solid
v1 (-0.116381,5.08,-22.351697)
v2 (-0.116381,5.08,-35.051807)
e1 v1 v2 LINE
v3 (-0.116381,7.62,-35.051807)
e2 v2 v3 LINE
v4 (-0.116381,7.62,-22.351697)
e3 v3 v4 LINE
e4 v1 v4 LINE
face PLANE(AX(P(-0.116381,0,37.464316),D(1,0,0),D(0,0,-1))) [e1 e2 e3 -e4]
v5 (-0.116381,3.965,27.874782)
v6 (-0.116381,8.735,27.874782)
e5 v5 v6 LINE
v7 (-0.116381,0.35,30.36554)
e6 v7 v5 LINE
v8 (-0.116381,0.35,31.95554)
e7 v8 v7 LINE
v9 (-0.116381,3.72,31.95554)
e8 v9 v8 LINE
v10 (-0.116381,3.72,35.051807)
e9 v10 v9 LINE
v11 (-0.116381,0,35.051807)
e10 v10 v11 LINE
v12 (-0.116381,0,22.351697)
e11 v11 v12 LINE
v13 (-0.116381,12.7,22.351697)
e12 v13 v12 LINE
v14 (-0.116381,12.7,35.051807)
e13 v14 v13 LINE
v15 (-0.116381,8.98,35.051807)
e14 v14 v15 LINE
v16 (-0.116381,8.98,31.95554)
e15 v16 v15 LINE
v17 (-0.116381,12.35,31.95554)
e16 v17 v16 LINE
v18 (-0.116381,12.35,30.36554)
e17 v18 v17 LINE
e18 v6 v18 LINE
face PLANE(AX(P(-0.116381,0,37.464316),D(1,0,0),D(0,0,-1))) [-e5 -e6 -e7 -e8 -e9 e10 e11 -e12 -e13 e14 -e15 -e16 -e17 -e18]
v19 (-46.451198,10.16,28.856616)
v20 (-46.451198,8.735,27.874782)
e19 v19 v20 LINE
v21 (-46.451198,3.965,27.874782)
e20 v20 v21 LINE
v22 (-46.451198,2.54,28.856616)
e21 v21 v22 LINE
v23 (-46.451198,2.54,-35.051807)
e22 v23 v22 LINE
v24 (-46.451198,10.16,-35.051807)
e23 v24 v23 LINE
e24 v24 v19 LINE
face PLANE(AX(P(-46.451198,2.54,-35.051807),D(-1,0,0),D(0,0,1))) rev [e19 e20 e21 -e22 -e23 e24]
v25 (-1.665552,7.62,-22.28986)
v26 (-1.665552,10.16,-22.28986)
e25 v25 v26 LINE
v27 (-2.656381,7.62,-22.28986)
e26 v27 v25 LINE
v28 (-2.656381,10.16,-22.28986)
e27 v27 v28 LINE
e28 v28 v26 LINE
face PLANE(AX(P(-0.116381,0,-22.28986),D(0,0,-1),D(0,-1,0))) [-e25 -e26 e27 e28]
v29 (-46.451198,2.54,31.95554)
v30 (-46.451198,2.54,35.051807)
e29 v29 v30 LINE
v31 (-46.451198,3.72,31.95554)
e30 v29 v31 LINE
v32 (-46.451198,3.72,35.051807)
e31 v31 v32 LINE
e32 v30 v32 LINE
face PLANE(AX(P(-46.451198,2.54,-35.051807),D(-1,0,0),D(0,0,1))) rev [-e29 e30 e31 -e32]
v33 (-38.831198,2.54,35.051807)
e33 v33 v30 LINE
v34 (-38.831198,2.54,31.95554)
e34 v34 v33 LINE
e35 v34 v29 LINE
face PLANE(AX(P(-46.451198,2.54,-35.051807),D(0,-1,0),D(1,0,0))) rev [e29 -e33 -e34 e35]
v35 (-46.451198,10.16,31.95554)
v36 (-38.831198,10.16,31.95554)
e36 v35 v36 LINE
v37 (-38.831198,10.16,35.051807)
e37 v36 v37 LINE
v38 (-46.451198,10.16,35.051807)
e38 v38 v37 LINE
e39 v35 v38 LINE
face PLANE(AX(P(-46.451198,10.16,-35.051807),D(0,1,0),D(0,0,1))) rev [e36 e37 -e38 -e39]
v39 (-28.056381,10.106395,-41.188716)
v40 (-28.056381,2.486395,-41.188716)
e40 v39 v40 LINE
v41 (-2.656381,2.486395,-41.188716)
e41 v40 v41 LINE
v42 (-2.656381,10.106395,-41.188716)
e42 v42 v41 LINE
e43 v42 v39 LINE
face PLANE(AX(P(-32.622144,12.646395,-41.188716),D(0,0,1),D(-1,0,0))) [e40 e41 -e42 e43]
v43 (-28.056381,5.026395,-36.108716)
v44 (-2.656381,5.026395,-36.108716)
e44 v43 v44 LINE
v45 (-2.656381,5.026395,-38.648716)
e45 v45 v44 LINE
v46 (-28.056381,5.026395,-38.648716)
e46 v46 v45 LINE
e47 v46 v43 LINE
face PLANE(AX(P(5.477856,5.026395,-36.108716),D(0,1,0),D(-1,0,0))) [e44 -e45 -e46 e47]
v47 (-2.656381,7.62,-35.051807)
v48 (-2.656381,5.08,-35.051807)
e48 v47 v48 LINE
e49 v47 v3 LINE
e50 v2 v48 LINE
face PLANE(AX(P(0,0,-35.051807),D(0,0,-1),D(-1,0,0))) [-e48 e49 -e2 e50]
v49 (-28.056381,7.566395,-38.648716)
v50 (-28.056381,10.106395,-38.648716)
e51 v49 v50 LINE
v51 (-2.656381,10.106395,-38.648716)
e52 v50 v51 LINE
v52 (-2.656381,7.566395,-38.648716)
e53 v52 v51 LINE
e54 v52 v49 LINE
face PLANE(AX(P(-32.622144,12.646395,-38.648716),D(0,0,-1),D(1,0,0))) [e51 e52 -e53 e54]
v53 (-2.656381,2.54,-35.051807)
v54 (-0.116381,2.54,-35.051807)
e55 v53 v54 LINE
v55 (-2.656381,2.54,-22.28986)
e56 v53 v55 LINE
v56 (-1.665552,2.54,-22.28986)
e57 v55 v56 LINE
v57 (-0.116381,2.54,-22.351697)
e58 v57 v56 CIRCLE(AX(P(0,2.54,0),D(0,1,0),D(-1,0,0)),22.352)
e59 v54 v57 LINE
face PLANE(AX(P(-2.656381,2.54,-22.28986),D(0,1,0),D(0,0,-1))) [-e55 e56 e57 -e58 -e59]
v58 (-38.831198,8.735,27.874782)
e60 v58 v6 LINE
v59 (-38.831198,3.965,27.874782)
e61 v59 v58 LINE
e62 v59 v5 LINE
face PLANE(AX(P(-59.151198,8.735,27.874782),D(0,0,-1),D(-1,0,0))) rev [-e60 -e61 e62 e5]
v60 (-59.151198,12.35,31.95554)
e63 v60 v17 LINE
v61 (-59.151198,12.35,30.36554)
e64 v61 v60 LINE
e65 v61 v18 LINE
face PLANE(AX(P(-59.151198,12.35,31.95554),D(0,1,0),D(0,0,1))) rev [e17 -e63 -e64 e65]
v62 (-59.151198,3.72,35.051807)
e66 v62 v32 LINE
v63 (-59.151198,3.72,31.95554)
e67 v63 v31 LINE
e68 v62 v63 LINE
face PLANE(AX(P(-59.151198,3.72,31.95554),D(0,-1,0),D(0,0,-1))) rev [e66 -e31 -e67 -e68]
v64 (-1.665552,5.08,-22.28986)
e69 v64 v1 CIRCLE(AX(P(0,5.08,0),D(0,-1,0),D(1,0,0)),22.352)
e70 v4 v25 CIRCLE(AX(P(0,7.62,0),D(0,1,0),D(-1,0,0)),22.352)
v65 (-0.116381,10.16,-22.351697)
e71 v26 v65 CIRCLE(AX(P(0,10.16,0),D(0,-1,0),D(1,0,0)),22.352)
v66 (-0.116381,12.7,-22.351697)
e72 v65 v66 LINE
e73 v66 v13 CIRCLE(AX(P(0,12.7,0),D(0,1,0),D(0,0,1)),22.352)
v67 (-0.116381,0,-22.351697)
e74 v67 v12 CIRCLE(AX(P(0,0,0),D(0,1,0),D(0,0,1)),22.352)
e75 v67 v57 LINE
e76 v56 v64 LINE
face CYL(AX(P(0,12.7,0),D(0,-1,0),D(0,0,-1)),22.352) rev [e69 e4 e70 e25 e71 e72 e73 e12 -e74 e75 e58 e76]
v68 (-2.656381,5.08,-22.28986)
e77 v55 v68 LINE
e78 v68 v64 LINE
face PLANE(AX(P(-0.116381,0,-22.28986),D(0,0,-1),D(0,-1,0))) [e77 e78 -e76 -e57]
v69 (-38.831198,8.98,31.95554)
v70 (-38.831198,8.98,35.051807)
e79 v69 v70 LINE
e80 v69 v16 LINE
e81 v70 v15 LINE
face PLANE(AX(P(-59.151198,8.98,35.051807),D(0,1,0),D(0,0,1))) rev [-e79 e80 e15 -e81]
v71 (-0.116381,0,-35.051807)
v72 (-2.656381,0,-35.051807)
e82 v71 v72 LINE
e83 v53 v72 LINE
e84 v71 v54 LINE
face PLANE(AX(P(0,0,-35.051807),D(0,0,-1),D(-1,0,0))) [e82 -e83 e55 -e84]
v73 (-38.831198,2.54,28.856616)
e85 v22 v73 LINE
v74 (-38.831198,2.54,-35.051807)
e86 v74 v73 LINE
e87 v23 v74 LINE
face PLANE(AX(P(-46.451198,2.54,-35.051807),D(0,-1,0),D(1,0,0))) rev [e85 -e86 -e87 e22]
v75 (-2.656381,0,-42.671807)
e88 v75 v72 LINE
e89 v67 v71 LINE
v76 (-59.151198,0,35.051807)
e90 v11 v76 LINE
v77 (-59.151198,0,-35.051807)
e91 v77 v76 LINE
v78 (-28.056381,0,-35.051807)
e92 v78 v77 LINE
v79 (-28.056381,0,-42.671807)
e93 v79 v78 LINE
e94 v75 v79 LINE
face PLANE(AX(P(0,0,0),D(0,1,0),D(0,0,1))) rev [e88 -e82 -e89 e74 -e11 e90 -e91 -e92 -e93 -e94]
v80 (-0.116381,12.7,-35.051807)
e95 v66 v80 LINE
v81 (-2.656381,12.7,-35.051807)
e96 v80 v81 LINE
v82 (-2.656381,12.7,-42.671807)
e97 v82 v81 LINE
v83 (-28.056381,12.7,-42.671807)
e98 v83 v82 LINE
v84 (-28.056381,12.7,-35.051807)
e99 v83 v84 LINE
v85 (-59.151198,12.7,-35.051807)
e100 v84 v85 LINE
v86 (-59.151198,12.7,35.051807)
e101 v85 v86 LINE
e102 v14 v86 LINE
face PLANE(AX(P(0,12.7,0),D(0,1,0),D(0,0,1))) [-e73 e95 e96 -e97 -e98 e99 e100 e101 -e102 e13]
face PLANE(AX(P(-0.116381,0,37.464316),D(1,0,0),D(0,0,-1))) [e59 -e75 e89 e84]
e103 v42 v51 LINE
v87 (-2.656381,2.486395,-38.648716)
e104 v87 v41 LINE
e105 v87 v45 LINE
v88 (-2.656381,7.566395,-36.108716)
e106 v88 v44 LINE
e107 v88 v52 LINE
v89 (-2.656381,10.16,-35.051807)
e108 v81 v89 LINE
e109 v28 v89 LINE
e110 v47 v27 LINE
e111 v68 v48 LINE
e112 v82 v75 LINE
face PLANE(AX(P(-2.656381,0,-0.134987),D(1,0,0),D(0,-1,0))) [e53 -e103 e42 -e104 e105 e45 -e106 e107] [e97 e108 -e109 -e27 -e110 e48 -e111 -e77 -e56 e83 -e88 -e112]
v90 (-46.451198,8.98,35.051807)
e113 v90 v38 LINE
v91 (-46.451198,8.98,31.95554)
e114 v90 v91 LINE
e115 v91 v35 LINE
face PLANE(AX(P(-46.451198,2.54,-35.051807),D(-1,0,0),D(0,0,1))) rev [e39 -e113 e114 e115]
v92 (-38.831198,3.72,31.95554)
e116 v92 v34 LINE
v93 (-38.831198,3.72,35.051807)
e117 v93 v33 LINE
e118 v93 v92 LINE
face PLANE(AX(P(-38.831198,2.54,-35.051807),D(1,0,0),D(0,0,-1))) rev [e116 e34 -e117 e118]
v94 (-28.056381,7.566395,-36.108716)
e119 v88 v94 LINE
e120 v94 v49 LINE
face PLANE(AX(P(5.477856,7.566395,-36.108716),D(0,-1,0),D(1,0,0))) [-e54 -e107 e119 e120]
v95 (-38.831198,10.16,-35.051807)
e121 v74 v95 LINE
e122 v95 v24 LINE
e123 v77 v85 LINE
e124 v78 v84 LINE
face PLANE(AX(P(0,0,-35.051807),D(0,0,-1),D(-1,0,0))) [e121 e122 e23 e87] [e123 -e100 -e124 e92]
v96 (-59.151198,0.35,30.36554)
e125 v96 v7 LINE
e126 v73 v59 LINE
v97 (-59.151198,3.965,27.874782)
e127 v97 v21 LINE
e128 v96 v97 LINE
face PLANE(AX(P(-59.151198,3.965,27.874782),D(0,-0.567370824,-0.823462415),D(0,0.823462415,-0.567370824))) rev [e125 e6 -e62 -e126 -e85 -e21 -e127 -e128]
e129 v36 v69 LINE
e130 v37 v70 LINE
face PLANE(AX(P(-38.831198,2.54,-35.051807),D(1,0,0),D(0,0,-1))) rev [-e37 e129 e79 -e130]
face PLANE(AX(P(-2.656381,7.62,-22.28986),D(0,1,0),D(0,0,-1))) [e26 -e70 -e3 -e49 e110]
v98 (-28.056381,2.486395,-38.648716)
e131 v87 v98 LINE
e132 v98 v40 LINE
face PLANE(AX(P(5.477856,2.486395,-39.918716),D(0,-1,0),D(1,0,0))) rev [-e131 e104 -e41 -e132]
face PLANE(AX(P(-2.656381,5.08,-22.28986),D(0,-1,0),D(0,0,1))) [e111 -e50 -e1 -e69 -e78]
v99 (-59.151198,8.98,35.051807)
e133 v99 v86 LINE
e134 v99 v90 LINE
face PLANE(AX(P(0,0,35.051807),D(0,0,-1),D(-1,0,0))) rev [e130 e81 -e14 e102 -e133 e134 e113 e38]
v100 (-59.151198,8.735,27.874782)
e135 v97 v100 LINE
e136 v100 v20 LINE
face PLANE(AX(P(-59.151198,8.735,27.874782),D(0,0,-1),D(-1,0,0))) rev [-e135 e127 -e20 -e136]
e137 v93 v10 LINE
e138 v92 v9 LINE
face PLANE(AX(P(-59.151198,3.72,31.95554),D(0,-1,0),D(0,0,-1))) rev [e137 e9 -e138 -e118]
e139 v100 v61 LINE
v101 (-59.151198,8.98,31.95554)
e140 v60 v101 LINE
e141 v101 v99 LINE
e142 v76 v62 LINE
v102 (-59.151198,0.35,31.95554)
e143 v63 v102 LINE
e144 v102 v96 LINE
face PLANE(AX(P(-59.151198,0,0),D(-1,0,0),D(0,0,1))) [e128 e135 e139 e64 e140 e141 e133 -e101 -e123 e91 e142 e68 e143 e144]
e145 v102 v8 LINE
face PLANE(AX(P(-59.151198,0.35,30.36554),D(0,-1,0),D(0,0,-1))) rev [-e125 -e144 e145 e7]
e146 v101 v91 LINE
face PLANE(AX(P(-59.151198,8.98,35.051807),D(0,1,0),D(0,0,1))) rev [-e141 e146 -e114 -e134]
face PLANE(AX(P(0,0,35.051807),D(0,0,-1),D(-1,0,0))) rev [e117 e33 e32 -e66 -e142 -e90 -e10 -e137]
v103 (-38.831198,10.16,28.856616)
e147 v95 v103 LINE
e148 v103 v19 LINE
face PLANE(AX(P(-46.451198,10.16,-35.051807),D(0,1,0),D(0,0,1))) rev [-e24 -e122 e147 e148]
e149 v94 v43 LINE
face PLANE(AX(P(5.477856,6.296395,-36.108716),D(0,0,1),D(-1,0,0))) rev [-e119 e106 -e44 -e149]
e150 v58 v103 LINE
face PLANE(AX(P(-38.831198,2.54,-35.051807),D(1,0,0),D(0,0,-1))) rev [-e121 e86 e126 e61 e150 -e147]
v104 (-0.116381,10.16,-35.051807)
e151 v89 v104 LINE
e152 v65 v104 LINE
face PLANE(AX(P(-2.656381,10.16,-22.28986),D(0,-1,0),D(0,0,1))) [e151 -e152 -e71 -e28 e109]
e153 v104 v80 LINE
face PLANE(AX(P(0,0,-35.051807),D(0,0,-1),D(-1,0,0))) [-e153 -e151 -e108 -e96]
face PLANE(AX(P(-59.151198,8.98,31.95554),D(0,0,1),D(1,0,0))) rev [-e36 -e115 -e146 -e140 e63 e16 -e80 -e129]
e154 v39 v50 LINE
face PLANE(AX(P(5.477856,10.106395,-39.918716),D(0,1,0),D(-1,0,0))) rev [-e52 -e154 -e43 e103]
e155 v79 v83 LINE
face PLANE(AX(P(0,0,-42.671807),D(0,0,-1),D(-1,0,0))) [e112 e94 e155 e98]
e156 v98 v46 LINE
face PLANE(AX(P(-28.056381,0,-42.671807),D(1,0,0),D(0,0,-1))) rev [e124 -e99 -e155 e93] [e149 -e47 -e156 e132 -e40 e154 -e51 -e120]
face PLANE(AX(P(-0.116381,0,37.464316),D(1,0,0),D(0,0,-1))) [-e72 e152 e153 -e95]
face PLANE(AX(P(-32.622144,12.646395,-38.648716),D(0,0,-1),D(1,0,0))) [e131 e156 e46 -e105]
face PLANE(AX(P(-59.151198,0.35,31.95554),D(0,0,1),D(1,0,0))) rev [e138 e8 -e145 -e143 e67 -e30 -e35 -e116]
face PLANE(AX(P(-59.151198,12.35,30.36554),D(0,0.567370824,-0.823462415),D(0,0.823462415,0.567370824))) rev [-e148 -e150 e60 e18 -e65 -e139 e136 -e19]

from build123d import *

# Parameters (mm, degrees)
SKETCH1_R               = 35.052
SKETCH1_R_2             = 22.352
BOSS_EXTRUDE2_DEPTH     = 12.7
CUT_EXTRUDE4_DEPTH      = 52.172017822
CUT_EXTRUDE4_DEPTH_BACK = 52.172017822
SKETCH4_W               = 50.006101534
SKETCH4_H               = 77.834708864
BOSS_EXTRUDE6_START     = -12.7
BOSS_EXTRUDE6_DEPTH     = 12.7
CUT_EXTRUDE5_DEPTH      = 93.599518977
CUT_EXTRUDE5_DEPTH_BACK = 93.599518977
SKETCH14_W              = 7.62
SKETCH14_H              = 7.62
CAVITY1_START           = 2.54
CAVITY1_DEPTH           = 2.54
CAVITY1_START_2         = 7.62
CAVITY1_2_DEPTH         = 2.54
SKETCH16_W              = 25.4
SKETCH16_H              = 12.7
BOSS_EXTRUDE8_DEPTH     = 7.62
CAVITY3_START           = -41.188715615
CAVITY3_OUTLINE_W       = 25.4
CAVITY3_OUTLINE_H       = 7.62
CAVITY3_DEPTH           = 2.54
CAVITY3_START_2         = -38.648715615
CAVITY3_2_OUTLINE_W     = 25.4
CAVITY3_2_OUTLINE_H     = 2.54
CAVITY3_2_DEPTH         = 2.54
CUT_EXTRUDE6_DEPTH      = 74.941076403
CUT_EXTRUDE6_DEPTH_BACK = 74.941076403


# Read off the part's stored shape, not the designer's step: Cavity1, Cavity3
with BuildPart() as part:
    # Sketch1 → Boss-Extrude2 (new body)
    with BuildSketch(Plane(origin=(0, 0, 0), x_dir=(1, 0, 0), z_dir=(0, 1, 0))):
        with Locations(Location((0, 0, 0), (0, 0, 270))):
            Circle(SKETCH1_R)
        with Locations(Location((0, 0, 0), (0, 0, 270))):
            Circle(SKETCH1_R_2, mode=Mode.SUBTRACT)
    extrude(amount=BOSS_EXTRUDE2_DEPTH)

    # Sketch4 → Cut-Extrude4 (cut, two sides: drawn at the far end of the back side and taken through both)
    with BuildSketch(Plane(origin=(0, 12.7, 0), x_dir=(1, 0, 0), z_dir=(0, 1, 0)).offset(-CUT_EXTRUDE4_DEPTH_BACK)):
        with Locations((24.88666989, 1.453038664)):
            Rectangle(SKETCH4_W, SKETCH4_H)
    extrude(amount=CUT_EXTRUDE4_DEPTH + CUT_EXTRUDE4_DEPTH_BACK, mode=Mode.SUBTRACT)

    # Sketch13 → Boss-Extrude6 (add)
    with BuildSketch(Plane(origin=(0, 12.7, 0), x_dir=(1, 0, 0), z_dir=(0, 1, 0)).offset(BOSS_EXTRUDE6_START)):
        with BuildLine():
            Line((-22.534267524, 26.848640397), (-22.534267524, 35.051806794))
            Line((-22.534267524, 35.051806794), (-59.151198439, 35.051806794))
            Line((-59.151198439, 35.051806794), (-59.151198439, -35.051806794))
            Line((-59.151198439, -35.051806794), (-22.534267524, -35.051806794))
            Line((-22.534267524, -35.051806794), (-22.534267524, -26.848640397))
            ThreePointArc((-22.534267524, -26.848640397), (-35.052, 0), (-22.534267524, 26.848640397))
        make_face()
        with BuildLine():
            ThreePointArc((-22.534267524, 26.848640397), (-12.045163053, 32.917423214), (-0.116380877, 35.051806794))
            Line((-0.116380877, 35.051806794), (-22.534267524, 35.051806794))
            Line((-22.534267524, 35.051806794), (-22.534267524, 26.848640397))
        make_face()
        with BuildLine():
            Line((-22.534267524, -35.051806794), (-0.116380877, -35.051806794))
            ThreePointArc((-0.116380877, -35.051806794), (-12.045163053, -32.917423214), (-22.534267524, -26.848640397))
            Line((-22.534267524, -26.848640397), (-22.534267524, -35.051806794))
        make_face()
    extrude(amount=BOSS_EXTRUDE6_DEPTH)

    # Sketch14 → Cut-Extrude5 (cut, two sides: drawn at the far end of the back side and taken through both)
    with BuildSketch(Plane.XY.offset(35.051806794).offset(-CUT_EXTRUDE5_DEPTH_BACK)):
        with Locations((-42.641198439, 6.35)):
            Rectangle(SKETCH14_W, SKETCH14_H)
    extrude(amount=CUT_EXTRUDE5_DEPTH + CUT_EXTRUDE5_DEPTH_BACK, mode=Mode.SUBTRACT)

    # Cavity1 outline → Cavity1 (cut)
    with BuildSketch(Plane(origin=(0, 0, 0), x_dir=(1, 0, 0), z_dir=(0, 1, 0)).offset(CAVITY1_START)):
        with BuildLine():
            Line((-2.656380877, 35.051806794), (-2.656380877, 22.289859607))
            Line((-2.656380877, 22.289859607), (-1.66555177, 22.289859607))
            ThreePointArc((-1.66555177, 22.289859607), (-0.891502639, 22.33421427), (-0.116380877, 22.351697016))
            Line((-0.116380877, 22.351697016), (-0.116380877, 35.051806794))
            Line((-0.116380877, 35.051806794), (-2.656380877, 35.051806794))
        make_face()
    extrude(amount=CAVITY1_DEPTH, mode=Mode.SUBTRACT)

    # Cavity1 2 outline → Cavity1 2 (cut)
    with BuildSketch(Plane(origin=(0, 0, 0), x_dir=(1, 0, 0), z_dir=(0, 1, 0)).offset(CAVITY1_START_2)):
        with BuildLine():
            Line((-2.656380877, 35.051806794), (-2.656380877, 22.289859607))
            Line((-2.656380877, 22.289859607), (-1.66555177, 22.289859607))
            ThreePointArc((-1.66555177, 22.289859607), (-0.891502639, 22.33421427), (-0.116380877, 22.351697016))
            Line((-0.116380877, 22.351697016), (-0.116380877, 35.051806794))
            Line((-0.116380877, 35.051806794), (-2.656380877, 35.051806794))
        make_face()
    extrude(amount=CAVITY1_2_DEPTH, mode=Mode.SUBTRACT)

    # Sketch16 → Boss-Extrude8 (add)
    with BuildSketch(Plane(origin=(0, 0, -35.051806794), x_dir=(-1, 0, 0), z_dir=(0, 0, -1))):
        with Locations((15.356380877, 6.35)):
            Rectangle(SKETCH16_W, SKETCH16_H)
    extrude(amount=BOSS_EXTRUDE8_DEPTH)

    # Cavity3 outline → Cavity3 (cut)
    with BuildSketch(Plane.XY.offset(CAVITY3_START)):
        with Locations((-15.356380877, 6.296394857)):
            Rectangle(CAVITY3_OUTLINE_W, CAVITY3_OUTLINE_H)
    extrude(amount=CAVITY3_DEPTH, mode=Mode.SUBTRACT)

    # Cavity3 2 outline → Cavity3 2 (cut)
    with BuildSketch(Plane.XY.offset(CAVITY3_START_2)):
        with Locations((-15.356380877, 6.296394857)):
            Rectangle(CAVITY3_2_OUTLINE_W, CAVITY3_2_OUTLINE_H)
    extrude(amount=CAVITY3_2_DEPTH, mode=Mode.SUBTRACT)

    # Sketch17 → Cut-Extrude6 (cut, two sides: drawn at the far end of the back side and taken through both)
    with BuildSketch(Plane(origin=(-0.116380877, 0, 0), x_dir=(0, 0, -1), z_dir=(1, 0, 0)).offset(-CUT_EXTRUDE6_DEPTH_BACK)):
        Polygon((-35.051806794, 8.979999947), (-31.955539721, 8.979999947), (-31.955539721, 12.349999947), (-30.365539721, 12.349999947), (-27.874781804, 8.734999947), (-27.874781804, 3.964999947), (-30.365539721, 0.349999947), (-31.955539721, 0.349999947), (-31.955539721, 3.719999947), (-35.051806794, 3.719999947), align=None)
    extrude(amount=CUT_EXTRUDE6_DEPTH + CUT_EXTRUDE6_DEPTH_BACK, mode=Mode.SUBTRACT)


solid = part.part
